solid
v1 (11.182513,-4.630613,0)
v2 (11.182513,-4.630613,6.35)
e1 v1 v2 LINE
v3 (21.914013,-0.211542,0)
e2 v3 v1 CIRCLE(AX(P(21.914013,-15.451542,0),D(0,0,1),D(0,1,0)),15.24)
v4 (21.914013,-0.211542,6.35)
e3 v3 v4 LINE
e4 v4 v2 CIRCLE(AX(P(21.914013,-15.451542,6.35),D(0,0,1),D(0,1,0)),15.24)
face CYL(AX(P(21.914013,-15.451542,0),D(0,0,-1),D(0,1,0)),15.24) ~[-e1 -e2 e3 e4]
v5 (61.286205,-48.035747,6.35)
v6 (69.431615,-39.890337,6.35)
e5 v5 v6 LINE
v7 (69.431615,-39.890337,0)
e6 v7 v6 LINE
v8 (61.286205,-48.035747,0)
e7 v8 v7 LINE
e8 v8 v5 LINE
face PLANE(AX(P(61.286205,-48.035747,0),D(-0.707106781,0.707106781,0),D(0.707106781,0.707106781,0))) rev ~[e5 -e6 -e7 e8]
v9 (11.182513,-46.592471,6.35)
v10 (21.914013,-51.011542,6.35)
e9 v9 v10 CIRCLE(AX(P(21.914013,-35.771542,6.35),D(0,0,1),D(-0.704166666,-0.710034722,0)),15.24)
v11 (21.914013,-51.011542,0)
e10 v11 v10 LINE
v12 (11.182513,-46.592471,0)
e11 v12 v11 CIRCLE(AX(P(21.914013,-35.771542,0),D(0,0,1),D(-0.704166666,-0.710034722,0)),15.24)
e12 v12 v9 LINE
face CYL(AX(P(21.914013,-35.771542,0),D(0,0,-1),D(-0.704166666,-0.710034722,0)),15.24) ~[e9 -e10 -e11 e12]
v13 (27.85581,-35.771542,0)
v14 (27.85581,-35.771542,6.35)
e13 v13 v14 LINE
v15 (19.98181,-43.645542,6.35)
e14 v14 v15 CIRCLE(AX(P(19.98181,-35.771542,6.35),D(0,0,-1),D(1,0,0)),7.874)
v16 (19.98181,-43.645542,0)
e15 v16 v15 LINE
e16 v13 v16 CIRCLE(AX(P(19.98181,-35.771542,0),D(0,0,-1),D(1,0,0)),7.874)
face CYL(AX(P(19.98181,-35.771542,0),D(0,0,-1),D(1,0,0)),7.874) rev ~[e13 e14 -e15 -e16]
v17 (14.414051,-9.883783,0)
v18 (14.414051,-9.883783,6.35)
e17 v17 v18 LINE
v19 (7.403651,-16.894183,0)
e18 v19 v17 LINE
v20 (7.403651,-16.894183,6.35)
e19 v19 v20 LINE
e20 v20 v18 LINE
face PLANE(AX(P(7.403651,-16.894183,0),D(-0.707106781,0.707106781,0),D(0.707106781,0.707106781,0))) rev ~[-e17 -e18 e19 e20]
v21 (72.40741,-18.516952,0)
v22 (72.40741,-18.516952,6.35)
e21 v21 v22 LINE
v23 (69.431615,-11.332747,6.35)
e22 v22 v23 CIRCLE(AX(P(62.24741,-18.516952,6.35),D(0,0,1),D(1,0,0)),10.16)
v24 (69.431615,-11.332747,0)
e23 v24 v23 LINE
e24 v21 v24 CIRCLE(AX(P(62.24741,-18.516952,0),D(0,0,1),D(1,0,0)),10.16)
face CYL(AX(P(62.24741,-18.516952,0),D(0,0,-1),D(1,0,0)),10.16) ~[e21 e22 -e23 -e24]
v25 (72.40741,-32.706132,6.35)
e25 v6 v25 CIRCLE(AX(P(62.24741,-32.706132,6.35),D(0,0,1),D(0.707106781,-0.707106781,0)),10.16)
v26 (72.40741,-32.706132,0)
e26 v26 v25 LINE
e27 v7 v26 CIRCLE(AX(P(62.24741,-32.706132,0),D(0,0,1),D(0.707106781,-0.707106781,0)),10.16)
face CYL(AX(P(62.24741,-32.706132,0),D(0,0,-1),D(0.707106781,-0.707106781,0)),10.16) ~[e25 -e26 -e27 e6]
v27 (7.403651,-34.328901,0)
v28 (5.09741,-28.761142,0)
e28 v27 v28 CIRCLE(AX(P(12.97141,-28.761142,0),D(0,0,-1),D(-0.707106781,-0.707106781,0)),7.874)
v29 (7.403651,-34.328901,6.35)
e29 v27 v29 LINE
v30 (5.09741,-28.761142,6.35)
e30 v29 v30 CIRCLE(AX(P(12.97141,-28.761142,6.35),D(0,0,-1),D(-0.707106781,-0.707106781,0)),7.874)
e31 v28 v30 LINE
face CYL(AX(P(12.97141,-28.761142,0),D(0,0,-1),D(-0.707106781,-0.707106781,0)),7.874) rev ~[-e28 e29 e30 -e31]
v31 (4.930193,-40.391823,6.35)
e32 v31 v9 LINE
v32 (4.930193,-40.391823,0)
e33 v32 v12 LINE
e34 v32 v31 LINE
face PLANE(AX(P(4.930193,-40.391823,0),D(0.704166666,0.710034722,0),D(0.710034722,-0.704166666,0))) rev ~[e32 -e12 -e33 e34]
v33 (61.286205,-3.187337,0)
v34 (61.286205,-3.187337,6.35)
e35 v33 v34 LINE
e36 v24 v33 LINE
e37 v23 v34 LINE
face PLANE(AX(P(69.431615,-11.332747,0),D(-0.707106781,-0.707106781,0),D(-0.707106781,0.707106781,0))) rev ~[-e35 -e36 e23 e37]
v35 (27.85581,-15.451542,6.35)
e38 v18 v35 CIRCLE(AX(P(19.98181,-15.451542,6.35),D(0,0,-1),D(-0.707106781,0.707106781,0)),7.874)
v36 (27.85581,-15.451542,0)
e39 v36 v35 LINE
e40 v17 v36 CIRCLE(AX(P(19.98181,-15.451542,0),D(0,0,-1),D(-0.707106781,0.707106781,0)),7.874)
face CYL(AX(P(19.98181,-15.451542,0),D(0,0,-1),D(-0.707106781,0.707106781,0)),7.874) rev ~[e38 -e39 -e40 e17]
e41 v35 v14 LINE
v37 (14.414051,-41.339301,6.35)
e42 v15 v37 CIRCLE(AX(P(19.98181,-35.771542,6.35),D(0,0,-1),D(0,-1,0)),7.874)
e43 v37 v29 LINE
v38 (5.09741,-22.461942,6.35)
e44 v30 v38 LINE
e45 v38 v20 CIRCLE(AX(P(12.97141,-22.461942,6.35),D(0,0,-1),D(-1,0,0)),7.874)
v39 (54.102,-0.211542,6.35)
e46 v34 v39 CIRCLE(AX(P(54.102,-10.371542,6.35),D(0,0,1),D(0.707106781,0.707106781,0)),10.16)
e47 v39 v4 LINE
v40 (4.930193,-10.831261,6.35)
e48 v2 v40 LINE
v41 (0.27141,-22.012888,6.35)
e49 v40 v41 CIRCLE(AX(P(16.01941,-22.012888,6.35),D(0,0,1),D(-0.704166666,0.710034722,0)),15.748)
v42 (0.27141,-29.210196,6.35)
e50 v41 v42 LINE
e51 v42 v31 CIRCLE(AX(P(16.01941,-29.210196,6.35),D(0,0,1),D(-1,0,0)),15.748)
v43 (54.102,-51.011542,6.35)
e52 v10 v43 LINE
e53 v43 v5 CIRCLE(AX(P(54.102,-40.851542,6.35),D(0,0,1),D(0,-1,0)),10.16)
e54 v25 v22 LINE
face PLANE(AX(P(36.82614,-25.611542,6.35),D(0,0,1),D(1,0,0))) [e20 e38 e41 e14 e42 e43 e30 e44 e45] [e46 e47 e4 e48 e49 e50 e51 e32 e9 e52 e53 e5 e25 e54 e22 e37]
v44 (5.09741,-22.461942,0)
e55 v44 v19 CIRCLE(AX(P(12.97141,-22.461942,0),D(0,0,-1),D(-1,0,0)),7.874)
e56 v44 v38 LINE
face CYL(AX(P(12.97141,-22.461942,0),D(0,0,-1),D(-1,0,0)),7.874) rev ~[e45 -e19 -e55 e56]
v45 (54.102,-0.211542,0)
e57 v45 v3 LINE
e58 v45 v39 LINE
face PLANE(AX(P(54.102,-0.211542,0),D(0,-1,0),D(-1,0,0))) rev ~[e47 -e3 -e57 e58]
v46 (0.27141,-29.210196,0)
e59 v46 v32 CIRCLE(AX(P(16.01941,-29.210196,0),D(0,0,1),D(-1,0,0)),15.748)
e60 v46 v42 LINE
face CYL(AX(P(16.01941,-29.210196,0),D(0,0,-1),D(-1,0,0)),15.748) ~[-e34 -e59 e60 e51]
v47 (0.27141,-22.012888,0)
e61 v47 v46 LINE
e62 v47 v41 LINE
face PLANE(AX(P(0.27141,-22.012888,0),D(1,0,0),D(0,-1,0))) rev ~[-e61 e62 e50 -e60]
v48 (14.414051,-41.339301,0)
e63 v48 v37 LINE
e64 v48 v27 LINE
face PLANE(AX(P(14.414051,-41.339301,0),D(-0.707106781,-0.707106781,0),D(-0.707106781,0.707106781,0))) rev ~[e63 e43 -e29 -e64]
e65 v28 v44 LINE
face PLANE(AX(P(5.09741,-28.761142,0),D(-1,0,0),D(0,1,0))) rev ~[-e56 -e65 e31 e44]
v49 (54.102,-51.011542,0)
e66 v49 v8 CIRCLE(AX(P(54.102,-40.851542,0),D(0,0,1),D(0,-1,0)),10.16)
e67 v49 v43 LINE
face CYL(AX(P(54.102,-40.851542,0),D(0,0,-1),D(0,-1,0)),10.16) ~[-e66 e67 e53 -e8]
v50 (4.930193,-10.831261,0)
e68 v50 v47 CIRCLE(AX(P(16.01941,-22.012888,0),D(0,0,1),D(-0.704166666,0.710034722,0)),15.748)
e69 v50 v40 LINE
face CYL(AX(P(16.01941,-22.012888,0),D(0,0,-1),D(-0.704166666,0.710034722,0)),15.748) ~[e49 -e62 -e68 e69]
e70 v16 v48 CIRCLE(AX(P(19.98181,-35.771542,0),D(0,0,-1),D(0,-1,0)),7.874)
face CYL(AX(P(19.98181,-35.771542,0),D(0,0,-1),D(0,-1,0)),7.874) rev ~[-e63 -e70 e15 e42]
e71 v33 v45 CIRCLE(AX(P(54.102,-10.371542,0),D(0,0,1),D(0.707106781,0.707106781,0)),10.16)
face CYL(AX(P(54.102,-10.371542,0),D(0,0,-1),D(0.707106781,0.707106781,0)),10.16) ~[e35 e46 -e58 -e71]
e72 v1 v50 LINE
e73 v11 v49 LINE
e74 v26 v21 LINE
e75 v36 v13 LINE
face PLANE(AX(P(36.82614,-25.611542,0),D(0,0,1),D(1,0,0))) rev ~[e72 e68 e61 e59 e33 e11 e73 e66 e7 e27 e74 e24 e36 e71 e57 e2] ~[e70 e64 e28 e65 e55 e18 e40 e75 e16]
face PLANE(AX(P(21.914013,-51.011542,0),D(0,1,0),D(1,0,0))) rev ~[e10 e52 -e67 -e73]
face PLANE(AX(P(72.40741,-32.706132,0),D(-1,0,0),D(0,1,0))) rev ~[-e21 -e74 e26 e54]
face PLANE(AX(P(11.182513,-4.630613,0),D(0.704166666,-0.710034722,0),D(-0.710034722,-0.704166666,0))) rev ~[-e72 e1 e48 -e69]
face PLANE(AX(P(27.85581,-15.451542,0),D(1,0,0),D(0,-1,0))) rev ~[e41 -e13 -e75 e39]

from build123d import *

# Parameters (mm, degrees)
F1_DEPTH = 6.35


# Not quite as in the source:
# - a feature names something its author has since deleted; it is built from what else it names


with BuildPart() as f1:
    # F0 (on Top) → F1 (new body)
    with BuildSketch(Plane.XY):
        with BuildLine():
            ThreePointArc((69.4316146906, -39.8903370424), (71.634025844, -36.5941958184), (72.4074097937, -32.7061321456))
            Line((72.4074097937, -32.7061321456), (72.4074097937, -18.516951733))
            ThreePointArc((72.4074097937, -18.516951733), (71.634025844, -14.6288880601), (69.4316146906, -11.3327468361))
            Line((69.4316146906, -11.3327468361), (61.2862048969, -3.1873370424))
            ThreePointArc((61.2862048969, -3.1873370424), (57.9900636728, -0.9849258889), (54.102, -0.2115419393))
            Line((54.102, -0.2115419393), (21.9140133571, -0.2115419393))
            ThreePointArc((21.9140133571, -0.2115419393), (16.1111416714, -1.3595484607), (11.1825133635, -4.6306127791))
            Line((11.1825133635, -4.6306127791), (4.9301931337, -10.8312609409))
            ThreePointArc((4.9301931337, -10.8312609409), (1.4826892564, -15.9562170355), (0.2714097937, -22.0128877397))
            Line((0.2714097937, -22.0128877397), (0.2714097937, -29.2101961388))
            ThreePointArc((0.2714097937, -29.2101961388), (1.4826892564, -35.266866843), (4.9301931337, -40.3918229376))
            Line((4.9301931337, -40.3918229376), (11.1825133635, -46.5924710994))
            ThreePointArc((11.1825133635, -46.5924710994), (16.1111416714, -49.8635354178), (21.9140133571, -51.0115419393))
            Line((21.9140133571, -51.0115419393), (54.102, -51.0115419393))
            ThreePointArc((54.102, -51.0115419393), (57.9900636728, -50.2381579896), (61.2862048969, -48.0357468361))
            Line((61.2862048969, -48.0357468361), (69.4316146906, -39.8903370424))
        make_face()
        with BuildLine():
            Line((27.8558097937, -15.4515419393), (27.8558097937, -35.7715419393))
            ThreePointArc((27.8558097937, -35.7715419393), (25.5495685888, -41.3393007343), (19.9818097937, -43.6455419393))
            ThreePointArc((19.9818097937, -43.6455419393), (16.9685604473, -43.0461693783), (14.4140509986, -41.3393007343))
            Line((14.4140509986, -41.3393007343), (7.4036509986, -34.3289007343))
            ThreePointArc((7.4036509986, -34.3289007343), (5.6967823547, -31.7743912857), (5.0974097937, -28.7611419393))
            Line((5.0974097937, -28.7611419393), (5.0974097937, -22.4619419393))
            ThreePointArc((5.0974097937, -22.4619419393), (5.6967823547, -19.4486925928), (7.4036509986, -16.8941831442))
            Line((7.4036509986, -16.8941831442), (14.4140509986, -9.8837831442))
            ThreePointArc((14.4140509986, -9.8837831442), (22.9950591402, -8.1769145003), (27.8558097937, -15.4515419393))
        make_face(mode=Mode.SUBTRACT)
    extrude(amount=F1_DEPTH)


solid = f1.part
